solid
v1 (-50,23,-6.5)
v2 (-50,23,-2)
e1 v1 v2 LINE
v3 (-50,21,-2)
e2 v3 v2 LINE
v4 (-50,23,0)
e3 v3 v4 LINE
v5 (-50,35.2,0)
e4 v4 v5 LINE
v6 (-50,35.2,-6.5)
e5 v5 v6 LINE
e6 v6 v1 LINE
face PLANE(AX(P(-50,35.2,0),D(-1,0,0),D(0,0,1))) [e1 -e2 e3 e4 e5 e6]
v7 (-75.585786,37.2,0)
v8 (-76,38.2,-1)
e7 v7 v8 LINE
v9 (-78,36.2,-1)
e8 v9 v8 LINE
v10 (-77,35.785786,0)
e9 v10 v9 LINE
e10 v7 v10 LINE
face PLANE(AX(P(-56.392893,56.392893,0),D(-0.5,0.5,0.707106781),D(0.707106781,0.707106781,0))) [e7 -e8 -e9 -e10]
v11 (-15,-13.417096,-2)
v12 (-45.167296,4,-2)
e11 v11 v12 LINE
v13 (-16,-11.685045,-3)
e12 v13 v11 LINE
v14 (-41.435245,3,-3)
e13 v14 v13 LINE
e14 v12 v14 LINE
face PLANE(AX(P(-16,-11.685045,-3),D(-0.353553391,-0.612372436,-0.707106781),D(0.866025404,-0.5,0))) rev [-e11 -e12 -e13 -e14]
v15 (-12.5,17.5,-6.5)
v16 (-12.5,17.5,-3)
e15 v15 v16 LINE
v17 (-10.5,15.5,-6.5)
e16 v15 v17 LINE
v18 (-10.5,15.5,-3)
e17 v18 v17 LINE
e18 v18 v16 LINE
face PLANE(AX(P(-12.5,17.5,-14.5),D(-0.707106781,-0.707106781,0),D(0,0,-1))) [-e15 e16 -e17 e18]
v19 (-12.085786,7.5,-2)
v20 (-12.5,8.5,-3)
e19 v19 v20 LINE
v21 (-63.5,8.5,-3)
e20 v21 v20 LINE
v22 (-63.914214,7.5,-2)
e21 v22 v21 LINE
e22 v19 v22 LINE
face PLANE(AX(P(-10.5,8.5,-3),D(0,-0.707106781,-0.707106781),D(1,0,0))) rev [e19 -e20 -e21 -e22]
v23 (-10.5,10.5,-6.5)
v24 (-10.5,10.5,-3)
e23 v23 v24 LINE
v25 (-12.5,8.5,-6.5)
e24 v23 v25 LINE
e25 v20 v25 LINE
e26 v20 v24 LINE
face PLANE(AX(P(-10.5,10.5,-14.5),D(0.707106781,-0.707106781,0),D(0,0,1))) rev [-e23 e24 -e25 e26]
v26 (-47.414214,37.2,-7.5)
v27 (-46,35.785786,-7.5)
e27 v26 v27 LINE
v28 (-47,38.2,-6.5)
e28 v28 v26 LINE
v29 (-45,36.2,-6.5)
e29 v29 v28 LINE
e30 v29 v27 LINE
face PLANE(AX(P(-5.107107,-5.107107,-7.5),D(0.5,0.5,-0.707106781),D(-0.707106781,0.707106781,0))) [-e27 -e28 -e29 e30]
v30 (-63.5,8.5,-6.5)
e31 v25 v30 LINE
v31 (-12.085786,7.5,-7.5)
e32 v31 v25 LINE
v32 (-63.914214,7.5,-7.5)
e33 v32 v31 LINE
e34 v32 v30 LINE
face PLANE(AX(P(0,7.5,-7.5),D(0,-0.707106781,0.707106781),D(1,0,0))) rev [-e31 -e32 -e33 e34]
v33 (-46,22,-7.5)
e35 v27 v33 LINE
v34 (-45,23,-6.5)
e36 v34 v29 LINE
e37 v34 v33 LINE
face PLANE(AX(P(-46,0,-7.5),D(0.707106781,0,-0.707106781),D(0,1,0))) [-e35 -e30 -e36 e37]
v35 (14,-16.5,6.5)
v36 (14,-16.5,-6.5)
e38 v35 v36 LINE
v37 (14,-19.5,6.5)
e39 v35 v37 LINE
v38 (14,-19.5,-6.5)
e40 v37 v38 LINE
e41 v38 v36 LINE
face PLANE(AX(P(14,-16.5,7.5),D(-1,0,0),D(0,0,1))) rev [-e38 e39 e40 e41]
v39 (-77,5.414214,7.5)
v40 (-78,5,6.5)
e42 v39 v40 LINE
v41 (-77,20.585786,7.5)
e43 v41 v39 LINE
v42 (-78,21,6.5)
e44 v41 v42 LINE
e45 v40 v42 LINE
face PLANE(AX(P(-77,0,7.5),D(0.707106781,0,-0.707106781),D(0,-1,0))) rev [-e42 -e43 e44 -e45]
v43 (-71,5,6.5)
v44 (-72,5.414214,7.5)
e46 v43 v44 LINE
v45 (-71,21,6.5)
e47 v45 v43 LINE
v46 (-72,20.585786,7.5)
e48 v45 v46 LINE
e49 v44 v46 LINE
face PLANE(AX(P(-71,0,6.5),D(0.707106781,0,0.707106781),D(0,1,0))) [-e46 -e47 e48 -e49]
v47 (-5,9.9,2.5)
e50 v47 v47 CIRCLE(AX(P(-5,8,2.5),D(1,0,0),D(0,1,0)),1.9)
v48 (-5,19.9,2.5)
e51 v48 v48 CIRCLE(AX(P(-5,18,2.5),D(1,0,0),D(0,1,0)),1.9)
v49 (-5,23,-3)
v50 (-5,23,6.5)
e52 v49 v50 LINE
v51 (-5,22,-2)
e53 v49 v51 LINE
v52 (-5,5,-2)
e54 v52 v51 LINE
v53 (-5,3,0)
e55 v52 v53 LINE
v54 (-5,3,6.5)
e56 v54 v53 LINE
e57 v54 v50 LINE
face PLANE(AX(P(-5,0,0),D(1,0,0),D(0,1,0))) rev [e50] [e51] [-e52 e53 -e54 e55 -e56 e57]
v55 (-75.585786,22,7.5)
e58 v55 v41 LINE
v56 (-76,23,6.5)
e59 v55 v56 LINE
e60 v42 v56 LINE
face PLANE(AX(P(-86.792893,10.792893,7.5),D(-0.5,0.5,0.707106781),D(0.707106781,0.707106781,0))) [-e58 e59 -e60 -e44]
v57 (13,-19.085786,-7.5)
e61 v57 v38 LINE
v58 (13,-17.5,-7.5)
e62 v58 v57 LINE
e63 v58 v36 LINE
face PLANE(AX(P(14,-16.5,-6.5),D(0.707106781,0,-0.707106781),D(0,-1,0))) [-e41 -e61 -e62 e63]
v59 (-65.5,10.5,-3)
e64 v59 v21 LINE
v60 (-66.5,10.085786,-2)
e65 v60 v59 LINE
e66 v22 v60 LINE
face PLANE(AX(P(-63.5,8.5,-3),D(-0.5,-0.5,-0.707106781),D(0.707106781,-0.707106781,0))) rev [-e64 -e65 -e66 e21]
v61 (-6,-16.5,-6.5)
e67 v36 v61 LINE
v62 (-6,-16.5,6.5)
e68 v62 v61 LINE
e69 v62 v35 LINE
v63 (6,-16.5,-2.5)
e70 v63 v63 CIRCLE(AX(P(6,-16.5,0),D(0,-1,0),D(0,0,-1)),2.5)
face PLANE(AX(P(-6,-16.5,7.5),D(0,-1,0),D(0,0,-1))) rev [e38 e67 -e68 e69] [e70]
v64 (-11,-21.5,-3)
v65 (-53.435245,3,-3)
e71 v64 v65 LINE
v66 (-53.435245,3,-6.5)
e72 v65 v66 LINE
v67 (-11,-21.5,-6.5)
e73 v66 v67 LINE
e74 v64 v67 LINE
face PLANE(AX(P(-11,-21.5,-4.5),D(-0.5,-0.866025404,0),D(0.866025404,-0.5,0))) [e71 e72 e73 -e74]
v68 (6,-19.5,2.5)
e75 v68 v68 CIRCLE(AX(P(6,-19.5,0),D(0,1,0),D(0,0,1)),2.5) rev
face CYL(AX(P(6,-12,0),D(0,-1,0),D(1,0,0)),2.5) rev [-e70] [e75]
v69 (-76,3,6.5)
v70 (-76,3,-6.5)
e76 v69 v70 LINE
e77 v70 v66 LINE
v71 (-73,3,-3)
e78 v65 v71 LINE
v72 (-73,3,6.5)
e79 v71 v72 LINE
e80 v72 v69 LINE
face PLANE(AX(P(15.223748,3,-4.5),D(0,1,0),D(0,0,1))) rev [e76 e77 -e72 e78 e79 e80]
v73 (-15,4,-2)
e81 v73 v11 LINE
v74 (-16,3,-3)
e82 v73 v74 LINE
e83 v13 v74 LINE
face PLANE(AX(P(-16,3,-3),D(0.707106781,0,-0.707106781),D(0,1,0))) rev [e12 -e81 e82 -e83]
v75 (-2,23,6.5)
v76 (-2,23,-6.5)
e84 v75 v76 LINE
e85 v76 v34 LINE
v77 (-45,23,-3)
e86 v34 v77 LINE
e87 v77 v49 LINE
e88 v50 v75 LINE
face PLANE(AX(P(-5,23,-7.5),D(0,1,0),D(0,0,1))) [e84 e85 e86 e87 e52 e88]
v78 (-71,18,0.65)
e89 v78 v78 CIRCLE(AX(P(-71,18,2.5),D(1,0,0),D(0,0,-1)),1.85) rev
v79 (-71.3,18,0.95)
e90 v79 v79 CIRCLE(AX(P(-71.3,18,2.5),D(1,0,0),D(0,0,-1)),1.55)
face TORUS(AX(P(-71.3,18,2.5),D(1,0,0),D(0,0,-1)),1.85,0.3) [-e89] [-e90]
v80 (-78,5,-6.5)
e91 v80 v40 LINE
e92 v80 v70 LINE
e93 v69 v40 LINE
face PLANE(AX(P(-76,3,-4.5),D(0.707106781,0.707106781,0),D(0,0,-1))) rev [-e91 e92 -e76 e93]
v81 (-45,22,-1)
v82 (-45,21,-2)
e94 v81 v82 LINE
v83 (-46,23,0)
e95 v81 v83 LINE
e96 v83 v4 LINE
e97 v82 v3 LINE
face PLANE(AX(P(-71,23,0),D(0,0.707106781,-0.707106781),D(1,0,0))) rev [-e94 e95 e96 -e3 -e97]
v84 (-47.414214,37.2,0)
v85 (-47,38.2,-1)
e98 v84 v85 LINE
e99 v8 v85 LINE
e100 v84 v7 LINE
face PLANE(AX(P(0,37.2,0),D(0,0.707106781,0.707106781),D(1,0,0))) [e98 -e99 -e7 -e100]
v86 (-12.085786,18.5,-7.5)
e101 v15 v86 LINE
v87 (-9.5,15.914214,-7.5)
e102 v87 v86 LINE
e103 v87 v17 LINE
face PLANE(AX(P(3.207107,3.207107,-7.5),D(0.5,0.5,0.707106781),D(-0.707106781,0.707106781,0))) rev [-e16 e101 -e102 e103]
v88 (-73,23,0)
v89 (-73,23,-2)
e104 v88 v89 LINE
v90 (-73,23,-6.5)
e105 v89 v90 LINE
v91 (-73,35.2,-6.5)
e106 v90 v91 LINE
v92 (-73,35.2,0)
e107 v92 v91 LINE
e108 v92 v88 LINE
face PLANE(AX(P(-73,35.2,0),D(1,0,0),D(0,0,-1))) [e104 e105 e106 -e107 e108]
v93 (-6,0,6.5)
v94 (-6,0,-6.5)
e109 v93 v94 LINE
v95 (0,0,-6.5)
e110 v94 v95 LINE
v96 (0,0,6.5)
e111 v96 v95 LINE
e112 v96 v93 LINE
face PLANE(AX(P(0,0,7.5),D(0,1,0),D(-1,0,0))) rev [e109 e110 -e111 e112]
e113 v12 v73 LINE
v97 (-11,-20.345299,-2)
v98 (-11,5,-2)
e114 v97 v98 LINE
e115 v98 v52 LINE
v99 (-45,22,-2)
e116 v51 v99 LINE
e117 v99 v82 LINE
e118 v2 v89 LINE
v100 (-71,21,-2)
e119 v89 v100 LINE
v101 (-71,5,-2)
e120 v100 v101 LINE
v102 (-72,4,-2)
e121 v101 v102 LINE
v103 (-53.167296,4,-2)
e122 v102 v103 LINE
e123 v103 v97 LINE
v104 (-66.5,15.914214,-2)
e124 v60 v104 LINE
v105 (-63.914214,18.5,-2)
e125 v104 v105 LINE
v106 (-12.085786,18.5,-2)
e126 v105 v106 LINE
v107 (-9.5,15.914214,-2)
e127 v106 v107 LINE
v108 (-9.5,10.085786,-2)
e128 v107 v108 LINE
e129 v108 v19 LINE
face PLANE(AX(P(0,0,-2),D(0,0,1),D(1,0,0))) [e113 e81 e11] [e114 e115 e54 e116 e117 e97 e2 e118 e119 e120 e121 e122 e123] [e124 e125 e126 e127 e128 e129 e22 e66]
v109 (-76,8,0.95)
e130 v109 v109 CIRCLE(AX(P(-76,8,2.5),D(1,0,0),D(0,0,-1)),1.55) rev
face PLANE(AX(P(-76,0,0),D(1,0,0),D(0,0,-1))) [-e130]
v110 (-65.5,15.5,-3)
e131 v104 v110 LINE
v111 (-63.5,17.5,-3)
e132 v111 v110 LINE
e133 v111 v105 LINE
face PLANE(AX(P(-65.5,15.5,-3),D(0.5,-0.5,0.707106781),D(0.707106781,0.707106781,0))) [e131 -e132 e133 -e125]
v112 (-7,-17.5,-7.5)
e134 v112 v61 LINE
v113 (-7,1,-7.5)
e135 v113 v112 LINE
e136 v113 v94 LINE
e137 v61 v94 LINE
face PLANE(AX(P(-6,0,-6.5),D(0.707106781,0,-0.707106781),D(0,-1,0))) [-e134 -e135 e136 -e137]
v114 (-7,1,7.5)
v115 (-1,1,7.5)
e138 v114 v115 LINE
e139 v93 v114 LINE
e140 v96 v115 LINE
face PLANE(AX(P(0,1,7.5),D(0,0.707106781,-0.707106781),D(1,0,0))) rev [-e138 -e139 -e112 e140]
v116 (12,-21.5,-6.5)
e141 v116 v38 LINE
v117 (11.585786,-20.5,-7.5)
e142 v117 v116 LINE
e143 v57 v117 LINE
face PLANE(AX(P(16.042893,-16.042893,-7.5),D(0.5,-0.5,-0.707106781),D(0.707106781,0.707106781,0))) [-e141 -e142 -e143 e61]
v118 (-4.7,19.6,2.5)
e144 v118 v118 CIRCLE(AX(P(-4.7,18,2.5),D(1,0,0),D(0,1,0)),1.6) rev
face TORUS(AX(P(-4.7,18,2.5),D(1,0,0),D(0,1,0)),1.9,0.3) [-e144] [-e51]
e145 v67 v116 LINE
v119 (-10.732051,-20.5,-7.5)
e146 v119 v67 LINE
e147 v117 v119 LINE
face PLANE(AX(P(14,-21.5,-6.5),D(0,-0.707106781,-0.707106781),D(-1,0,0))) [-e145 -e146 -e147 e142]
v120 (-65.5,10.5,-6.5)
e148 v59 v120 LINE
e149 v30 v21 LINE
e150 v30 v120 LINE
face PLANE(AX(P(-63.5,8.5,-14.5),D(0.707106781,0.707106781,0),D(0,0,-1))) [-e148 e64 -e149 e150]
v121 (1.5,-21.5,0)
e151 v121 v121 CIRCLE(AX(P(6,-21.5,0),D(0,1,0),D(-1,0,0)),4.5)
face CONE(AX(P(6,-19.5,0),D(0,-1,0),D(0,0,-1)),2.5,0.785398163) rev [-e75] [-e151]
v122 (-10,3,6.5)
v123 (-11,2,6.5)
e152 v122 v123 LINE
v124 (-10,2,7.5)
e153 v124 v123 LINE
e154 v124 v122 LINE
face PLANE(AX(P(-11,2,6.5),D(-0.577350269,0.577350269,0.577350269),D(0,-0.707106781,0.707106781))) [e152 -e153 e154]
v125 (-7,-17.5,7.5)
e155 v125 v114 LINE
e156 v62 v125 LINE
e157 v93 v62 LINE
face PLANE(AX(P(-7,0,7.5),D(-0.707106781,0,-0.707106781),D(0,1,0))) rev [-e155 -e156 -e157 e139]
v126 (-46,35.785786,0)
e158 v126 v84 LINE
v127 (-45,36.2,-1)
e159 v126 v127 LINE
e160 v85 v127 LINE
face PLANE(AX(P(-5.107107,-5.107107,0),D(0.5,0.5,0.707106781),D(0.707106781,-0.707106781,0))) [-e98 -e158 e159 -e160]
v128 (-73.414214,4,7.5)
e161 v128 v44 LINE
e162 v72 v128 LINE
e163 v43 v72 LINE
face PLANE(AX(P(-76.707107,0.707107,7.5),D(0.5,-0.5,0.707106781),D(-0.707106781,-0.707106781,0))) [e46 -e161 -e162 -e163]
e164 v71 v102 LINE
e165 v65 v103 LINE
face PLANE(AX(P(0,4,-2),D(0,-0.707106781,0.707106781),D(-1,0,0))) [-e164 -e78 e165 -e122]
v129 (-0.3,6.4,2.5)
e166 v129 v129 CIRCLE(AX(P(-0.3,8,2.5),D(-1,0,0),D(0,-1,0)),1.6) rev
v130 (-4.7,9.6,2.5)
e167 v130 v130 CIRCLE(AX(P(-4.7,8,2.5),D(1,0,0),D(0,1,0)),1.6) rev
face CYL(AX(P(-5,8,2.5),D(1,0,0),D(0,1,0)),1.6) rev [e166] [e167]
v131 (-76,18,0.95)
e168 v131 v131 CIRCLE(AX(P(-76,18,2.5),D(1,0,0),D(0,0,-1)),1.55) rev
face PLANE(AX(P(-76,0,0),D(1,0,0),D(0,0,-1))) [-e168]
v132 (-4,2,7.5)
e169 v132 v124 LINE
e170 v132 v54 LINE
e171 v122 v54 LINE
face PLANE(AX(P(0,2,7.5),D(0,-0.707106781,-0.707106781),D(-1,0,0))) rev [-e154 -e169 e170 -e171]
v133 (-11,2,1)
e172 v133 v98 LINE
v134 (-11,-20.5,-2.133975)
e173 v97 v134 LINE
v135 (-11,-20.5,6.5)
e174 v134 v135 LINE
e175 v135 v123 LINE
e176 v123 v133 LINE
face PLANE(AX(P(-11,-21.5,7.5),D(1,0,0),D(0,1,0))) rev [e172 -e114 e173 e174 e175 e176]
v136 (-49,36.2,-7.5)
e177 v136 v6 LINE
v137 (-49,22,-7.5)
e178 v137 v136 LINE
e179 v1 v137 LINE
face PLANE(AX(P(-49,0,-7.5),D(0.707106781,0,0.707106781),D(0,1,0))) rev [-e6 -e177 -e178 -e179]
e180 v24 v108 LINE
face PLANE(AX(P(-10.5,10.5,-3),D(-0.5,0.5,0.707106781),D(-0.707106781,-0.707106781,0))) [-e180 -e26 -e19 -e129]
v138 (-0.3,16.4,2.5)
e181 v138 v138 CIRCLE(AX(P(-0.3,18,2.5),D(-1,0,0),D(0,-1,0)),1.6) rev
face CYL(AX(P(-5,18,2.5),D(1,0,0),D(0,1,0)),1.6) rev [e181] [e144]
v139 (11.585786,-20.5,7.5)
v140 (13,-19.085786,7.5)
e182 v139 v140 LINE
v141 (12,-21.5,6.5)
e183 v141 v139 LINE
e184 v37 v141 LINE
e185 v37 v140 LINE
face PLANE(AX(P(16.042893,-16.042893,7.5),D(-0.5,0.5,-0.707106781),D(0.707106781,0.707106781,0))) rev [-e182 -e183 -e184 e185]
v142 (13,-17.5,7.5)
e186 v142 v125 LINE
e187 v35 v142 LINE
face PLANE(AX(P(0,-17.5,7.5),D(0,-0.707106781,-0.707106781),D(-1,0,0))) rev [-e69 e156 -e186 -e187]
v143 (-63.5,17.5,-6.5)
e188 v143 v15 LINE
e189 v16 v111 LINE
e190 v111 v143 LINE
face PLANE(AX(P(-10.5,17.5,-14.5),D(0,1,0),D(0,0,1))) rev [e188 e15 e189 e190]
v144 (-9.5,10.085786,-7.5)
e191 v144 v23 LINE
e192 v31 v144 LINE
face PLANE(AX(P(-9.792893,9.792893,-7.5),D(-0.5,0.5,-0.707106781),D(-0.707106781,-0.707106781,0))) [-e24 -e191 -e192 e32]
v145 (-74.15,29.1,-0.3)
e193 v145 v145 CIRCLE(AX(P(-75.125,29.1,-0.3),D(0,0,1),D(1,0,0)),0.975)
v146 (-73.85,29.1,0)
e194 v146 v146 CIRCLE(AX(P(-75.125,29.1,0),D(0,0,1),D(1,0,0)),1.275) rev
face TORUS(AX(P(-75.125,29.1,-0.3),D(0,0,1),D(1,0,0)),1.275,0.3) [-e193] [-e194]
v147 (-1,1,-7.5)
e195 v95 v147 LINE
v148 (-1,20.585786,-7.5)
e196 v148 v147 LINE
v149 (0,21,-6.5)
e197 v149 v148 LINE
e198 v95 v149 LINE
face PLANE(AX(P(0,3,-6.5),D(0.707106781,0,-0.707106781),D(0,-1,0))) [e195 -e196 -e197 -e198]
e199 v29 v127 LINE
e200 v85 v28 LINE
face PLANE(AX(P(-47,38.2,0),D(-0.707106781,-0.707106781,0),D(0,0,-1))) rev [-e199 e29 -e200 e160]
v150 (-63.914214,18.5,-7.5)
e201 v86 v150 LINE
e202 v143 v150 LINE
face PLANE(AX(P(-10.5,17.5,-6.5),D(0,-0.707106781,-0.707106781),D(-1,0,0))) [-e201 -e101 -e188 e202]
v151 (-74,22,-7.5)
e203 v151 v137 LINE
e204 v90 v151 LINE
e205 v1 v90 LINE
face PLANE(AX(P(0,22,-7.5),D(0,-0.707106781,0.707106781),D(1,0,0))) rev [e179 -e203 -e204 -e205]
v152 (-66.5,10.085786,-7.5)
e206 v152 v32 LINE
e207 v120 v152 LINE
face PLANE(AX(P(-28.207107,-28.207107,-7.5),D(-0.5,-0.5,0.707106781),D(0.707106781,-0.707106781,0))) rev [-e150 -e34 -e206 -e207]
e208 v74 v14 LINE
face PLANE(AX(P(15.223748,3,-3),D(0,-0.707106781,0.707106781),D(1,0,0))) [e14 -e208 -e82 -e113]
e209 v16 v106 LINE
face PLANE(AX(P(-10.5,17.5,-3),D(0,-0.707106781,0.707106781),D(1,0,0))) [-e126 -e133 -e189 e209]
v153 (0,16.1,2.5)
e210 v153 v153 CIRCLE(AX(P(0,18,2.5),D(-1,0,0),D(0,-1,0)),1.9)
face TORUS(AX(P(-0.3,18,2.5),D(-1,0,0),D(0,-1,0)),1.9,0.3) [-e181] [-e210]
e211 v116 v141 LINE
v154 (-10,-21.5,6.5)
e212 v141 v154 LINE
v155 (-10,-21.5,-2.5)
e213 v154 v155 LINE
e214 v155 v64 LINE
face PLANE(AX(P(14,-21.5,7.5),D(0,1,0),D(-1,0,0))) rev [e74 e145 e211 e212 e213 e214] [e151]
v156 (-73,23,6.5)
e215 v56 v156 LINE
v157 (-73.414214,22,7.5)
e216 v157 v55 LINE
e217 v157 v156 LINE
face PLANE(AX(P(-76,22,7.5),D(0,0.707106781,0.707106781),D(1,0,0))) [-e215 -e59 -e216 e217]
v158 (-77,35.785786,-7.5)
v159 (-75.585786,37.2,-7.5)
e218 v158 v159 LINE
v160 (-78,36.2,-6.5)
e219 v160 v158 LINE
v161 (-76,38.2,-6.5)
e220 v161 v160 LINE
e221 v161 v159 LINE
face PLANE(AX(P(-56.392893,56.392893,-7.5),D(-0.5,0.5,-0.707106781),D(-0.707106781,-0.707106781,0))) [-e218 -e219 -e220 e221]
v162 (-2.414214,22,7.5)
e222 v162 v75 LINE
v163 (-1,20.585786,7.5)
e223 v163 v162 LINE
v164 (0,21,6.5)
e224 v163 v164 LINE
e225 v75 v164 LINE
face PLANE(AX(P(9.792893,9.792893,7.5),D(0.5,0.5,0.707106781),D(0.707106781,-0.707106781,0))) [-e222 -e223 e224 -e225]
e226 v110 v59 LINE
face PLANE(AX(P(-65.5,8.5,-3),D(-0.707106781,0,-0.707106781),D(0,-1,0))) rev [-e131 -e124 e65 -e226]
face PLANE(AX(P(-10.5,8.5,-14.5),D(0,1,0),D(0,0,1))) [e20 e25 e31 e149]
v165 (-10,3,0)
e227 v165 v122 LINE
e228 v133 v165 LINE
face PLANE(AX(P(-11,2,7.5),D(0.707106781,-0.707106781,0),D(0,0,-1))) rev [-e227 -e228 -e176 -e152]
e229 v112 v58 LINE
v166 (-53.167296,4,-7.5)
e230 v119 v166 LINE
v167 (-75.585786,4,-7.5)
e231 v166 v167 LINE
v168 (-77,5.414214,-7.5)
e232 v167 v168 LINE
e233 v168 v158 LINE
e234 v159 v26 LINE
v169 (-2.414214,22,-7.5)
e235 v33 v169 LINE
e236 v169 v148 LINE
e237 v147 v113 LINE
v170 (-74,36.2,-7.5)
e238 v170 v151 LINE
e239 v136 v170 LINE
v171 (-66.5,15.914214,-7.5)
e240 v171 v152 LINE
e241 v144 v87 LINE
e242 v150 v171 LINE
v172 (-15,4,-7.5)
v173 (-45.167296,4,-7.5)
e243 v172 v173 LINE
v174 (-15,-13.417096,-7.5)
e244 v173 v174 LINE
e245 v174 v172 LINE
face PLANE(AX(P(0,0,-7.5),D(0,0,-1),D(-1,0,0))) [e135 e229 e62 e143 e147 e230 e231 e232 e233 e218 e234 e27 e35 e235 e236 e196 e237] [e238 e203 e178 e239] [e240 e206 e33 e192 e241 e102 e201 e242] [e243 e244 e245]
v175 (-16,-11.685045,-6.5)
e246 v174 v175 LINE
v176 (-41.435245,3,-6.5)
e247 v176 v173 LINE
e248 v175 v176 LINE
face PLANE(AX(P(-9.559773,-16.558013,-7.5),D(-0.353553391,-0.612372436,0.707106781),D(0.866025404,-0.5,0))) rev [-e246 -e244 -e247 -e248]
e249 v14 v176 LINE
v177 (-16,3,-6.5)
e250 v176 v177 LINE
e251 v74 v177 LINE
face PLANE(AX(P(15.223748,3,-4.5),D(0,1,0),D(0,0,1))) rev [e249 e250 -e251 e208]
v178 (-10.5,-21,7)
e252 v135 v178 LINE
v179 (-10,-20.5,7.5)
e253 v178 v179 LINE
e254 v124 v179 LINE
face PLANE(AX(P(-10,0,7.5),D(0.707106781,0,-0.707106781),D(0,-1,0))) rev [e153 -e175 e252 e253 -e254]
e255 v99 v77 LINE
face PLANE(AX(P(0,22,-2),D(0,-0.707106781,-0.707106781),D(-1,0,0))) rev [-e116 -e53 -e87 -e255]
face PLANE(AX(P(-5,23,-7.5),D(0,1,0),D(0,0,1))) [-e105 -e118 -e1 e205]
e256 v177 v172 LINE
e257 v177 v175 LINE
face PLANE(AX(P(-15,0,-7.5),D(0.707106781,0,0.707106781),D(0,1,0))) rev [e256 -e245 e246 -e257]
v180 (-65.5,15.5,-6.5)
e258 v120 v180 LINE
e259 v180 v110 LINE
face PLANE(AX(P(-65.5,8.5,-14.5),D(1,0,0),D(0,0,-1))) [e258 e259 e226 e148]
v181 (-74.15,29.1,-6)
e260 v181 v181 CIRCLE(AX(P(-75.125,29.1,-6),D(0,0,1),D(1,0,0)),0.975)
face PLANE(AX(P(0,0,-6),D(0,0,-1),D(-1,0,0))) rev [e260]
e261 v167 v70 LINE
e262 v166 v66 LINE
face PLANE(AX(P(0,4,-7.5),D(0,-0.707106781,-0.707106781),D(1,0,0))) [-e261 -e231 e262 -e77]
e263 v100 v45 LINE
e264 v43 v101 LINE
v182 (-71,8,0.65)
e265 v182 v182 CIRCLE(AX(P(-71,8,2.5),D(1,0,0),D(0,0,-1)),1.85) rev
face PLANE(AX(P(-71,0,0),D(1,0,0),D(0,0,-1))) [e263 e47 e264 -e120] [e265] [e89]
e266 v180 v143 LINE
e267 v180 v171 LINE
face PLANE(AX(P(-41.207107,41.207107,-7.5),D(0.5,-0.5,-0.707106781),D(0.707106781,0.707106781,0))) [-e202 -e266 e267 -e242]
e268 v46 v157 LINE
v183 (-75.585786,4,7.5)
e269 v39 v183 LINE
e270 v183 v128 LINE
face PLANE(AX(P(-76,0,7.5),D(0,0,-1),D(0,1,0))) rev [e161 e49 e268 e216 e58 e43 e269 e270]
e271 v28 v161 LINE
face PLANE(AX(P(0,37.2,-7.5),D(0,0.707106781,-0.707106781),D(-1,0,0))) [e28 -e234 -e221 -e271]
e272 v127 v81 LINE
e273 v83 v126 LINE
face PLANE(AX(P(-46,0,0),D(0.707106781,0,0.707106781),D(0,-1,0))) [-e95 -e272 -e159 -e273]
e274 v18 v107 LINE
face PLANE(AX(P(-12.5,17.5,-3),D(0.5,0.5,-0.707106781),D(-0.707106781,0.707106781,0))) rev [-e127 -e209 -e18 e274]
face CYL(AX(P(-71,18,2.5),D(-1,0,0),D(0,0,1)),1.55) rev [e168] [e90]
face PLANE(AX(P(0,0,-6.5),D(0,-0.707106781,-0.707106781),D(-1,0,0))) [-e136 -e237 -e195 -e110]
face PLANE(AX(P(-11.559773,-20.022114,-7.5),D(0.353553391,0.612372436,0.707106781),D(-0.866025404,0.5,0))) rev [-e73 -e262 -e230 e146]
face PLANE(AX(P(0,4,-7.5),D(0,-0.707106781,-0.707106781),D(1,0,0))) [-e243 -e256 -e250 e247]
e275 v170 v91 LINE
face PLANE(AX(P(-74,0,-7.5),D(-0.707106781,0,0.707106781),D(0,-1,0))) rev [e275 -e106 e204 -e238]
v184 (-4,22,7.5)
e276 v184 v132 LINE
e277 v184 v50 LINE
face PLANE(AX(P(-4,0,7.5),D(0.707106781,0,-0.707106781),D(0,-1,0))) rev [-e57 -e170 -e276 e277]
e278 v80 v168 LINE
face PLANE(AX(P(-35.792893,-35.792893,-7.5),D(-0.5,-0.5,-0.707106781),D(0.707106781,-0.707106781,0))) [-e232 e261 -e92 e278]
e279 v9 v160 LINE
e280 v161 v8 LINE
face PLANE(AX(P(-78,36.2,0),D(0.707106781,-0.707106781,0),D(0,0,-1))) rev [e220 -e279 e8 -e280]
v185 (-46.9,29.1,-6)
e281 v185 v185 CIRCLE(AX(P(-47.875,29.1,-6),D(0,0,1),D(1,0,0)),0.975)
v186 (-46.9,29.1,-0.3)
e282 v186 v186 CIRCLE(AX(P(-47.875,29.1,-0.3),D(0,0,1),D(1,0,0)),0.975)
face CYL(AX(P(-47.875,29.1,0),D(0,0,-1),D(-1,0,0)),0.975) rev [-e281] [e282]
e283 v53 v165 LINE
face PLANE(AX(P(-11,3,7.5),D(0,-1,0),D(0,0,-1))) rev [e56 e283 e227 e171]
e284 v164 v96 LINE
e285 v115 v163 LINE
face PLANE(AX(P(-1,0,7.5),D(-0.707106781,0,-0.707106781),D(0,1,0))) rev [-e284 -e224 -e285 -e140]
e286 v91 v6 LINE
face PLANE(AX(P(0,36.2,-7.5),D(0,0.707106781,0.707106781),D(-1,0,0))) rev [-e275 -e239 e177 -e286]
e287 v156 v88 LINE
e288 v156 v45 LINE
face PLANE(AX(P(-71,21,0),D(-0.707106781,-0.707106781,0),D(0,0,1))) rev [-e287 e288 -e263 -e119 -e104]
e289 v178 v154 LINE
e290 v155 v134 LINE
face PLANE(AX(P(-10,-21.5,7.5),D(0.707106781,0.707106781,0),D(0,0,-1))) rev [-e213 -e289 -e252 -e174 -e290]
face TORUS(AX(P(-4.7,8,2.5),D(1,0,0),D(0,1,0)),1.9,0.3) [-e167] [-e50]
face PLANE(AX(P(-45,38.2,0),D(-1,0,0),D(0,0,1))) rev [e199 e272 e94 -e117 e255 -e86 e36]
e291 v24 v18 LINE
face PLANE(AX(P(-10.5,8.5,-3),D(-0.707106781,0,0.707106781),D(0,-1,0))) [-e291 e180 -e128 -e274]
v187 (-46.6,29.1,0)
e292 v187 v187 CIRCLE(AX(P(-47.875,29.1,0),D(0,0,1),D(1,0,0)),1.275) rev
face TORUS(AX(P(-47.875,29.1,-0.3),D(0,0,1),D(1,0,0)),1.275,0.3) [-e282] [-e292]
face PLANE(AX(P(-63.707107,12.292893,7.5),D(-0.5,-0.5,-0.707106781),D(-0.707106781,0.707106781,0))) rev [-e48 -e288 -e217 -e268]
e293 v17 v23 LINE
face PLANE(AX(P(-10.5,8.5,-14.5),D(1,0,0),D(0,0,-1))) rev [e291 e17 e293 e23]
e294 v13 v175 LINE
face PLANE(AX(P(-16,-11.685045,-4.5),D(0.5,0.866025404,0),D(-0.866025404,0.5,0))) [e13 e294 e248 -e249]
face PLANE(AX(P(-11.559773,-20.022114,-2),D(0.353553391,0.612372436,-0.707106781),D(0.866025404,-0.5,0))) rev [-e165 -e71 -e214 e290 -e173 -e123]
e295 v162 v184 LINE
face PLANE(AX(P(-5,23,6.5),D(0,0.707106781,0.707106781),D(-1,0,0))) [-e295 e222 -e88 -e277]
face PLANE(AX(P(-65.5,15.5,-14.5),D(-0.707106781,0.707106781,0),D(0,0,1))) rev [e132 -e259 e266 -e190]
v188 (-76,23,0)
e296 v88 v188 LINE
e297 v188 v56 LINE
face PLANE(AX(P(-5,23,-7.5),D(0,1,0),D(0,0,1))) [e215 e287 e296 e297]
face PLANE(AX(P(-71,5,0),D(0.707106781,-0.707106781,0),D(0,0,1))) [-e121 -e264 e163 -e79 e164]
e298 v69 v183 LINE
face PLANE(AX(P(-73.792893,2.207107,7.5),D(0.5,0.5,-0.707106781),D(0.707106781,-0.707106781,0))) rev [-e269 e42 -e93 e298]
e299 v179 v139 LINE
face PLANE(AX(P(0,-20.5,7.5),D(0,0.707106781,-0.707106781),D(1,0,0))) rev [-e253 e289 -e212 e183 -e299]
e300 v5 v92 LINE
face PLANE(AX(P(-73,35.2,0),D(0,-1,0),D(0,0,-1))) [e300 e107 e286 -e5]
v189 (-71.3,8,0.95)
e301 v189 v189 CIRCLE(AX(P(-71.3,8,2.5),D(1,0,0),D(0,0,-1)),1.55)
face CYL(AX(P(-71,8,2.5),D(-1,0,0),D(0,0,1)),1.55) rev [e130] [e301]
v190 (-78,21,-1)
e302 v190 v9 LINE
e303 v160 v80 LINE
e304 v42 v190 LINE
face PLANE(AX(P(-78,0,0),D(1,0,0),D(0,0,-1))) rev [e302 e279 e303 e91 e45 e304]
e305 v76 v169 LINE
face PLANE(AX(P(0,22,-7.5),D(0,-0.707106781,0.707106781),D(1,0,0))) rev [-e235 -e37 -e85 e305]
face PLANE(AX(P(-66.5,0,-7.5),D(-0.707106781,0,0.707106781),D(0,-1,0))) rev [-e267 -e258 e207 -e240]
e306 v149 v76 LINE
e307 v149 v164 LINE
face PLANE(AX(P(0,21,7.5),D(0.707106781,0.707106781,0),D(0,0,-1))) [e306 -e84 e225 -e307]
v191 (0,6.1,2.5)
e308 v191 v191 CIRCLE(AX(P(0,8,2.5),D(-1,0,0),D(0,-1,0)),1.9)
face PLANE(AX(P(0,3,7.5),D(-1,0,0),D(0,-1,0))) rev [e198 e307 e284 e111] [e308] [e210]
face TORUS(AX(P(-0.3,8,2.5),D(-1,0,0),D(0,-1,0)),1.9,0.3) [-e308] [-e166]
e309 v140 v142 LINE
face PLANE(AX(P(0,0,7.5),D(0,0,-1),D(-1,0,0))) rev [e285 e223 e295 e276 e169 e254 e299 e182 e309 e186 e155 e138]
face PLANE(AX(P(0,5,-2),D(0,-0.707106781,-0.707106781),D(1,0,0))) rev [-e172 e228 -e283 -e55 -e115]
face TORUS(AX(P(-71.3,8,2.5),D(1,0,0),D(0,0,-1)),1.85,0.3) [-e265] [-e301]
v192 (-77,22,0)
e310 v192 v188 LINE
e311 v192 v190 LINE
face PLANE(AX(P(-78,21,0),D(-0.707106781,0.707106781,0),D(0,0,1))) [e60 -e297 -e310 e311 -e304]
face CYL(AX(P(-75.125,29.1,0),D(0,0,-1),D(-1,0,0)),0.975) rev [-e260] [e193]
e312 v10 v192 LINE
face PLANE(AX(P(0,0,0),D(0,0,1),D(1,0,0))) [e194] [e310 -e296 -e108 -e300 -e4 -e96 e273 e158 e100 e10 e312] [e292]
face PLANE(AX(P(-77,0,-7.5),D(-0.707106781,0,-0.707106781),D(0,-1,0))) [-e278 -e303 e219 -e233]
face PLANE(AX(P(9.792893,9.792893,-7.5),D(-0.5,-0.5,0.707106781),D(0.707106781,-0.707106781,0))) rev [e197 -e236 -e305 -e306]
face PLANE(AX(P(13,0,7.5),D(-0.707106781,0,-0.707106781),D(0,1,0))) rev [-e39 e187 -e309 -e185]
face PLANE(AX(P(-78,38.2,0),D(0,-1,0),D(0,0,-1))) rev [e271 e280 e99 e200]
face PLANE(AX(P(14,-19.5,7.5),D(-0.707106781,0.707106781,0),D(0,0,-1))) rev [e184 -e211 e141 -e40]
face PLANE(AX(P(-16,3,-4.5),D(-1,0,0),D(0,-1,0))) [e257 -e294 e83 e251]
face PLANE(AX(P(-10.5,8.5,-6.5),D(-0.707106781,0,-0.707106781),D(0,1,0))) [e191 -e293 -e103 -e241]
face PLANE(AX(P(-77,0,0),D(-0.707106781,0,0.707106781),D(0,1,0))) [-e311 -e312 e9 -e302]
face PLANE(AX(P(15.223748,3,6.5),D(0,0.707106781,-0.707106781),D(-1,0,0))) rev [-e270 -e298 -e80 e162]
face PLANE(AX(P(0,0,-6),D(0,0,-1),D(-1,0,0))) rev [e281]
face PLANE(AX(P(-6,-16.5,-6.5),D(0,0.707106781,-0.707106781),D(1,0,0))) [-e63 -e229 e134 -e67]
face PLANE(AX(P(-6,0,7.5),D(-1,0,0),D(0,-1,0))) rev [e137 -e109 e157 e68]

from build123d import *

# Parameters (mm, degrees)
RESSALTO_EXTRUS_O1_DEPTH  = 7.5
ESBO_O2_W                 = 33
ESBO_O2_H                 = 18.2
ESBO_O2_R                 = 0.975
ESBO_O2_W_2               = 23
ESBO_O2_H_2               = 12.2
RESSALTO_EXTRUS_O2_DEPTH  = 3
ESBO_O3_R                 = 0.975
RESSALTO_EXTRUS_O3_DEPTH  = 6
RESSALTO_EXTRUS_O4_DEPTH  = 1.5
ESBO_O6_R                 = 2.5
CORTE_EXTRUS_O1_DEPTH     = 9.5
CHANFRO1_SIZE             = 2
ESBO_O7_W                 = 15
ESBO_O7_H                 = 20
ESBO_O7_R                 = 1.6
RESSALTO_EXTRUS_O5_DEPTH  = 5
ESBO_O9_W                 = 12
ESBO_O9_H                 = 20
RESSALTO_EXTRUS_O6_DEPTH  = 2
ESBO_O10_W                = 12
ESBO_O10_H                = 20
ESBO_O10_R                = 1.55
RESSALTO_EXTRUS_O7_DEPTH  = 5
ESBO_O12_W                = 3
ESBO_O12_H                = 20
RESSALTO_EXTRUS_O11_DEPTH = 73
ESBO_O17_W                = 26
ESBO_O17_H                = 3
CORTE_EXTRUS_O2_DEPTH     = 4.5
ESBO_O18_R                = 0.975
RESSALTO_EXTRUS_O14_DEPTH = 4.5
ESBO_O19_W                = 55
ESBO_O19_H                = 9
CORTE_EXTRUS_O3_DEPTH     = 10
CHANFRO5_SIZE             = 2
RESSALTO_EXTRUS_O15_DEPTH = 3
RESSALTO_EXTRUS_O16_DEPTH = 2.5
CHANFRO8_SIZE             = 2
CHANFRO9_SIZE             = 2
CHANFRO10_SIZE            = 1
CHANFRO11_SIZE            = 1
FILETE1_R                 = 0.3


with BuildPart() as part:
    # Esboço1 → Ressalto-extrusão1 (new, symmetric)
    with BuildSketch(Plane.XY):
        Polygon((0, 0), (-6, 0), (-6, -16.5), (14, -16.5), (14, -21.5), (-11, -21.5), (-11, 3), (0, 3), align=None)
    extrude(amount=RESSALTO_EXTRUS_O1_DEPTH, both=True)

    # Esboço6 → Corte-extrusão1 (cut)
    with BuildSketch(Plane.XZ.offset(21.5)):
        with Locations((6, 0)):
            Circle(ESBO_O6_R)
    extrude(amount=-CORTE_EXTRUS_O1_DEPTH, mode=Mode.SUBTRACT)

    # Chanfro1
    chanfro1_edges = [part.edges().sort_by_distance(p)[0] for p in [
        (3.5, -21.5, 0),
    ]]
    chamfer(chanfro1_edges, length=CHANFRO1_SIZE)

    # Esboço7 → Ressalto-extrusão5 (add)
    with BuildSketch(Plane(origin=(0, 0, 0), x_dir=(0, 0, -1), z_dir=(1, 0, 0))):
        with Locations((0, 13)):
            Rectangle(ESBO_O7_W, ESBO_O7_H)
        with Locations(Location((-2.5, 18, 0), (0, 0, 90))):
            Circle(ESBO_O7_R, mode=Mode.SUBTRACT)
        with Locations(Location((-2.5, 8, 0), (0, 0, 90))):
            Circle(ESBO_O7_R, mode=Mode.SUBTRACT)
    extrude(amount=-RESSALTO_EXTRUS_O5_DEPTH)



with BuildPart() as body_2:
    # Esboço2 → Ressalto-extrusão2 (new body)
    with BuildSketch(Plane.XY.offset(-3)):
        with Locations((-61.5, 29.1)):
            Rectangle(ESBO_O2_W, ESBO_O2_H)
        with Locations((-75.125, 29.1)):
            Circle(ESBO_O2_R, mode=Mode.SUBTRACT)
        with Locations((-47.875, 29.1)):
            Circle(ESBO_O2_R, mode=Mode.SUBTRACT)
        with Locations((-61.5, 29.1)):
            Rectangle(ESBO_O2_W_2, ESBO_O2_H_2, mode=Mode.SUBTRACT)
    extrude(amount=RESSALTO_EXTRUS_O2_DEPTH)

    # Esboço3 → Ressalto-extrusão3 (add)
    # profile 1 of 2: a face of its own
    with BuildSketch(Plane.XY):
        Polygon((-75.125, 31.553738644), (-77.25, 30.326869322), (-77.25, 27.873130678), (-75.125, 26.646261356), (-73, 27.873130678), (-73, 30.326869322), align=None)
        with Locations((-75.125, 29.1)):
            Circle(ESBO_O3_R, mode=Mode.SUBTRACT)
    # profile 2 of 2: a face of its own
    with BuildSketch(Plane.XY):
        Polygon((-47.875, 31.553738644), (-50, 30.326869322), (-50, 27.873130678), (-47.875, 26.646261356), (-45.75, 27.873130678), (-45.75, 30.326869322), align=None)
        with Locations((-47.875, 29.1)):
            Circle(ESBO_O3_R, mode=Mode.SUBTRACT)
    extrude(amount=-RESSALTO_EXTRUS_O3_DEPTH)

    # Esboço4 → Ressalto-extrusão4 (add)
    with BuildSketch(Plane(origin=(0, 0, -6), x_dir=(-1, 0, 0), z_dir=(0, 0, -1))):
        Polygon((47.875, 31.553738644), (45.75, 30.326869322), (45.75, 27.873130678), (47.875, 26.646261356), (50, 27.873130678), (50, 30.326869322), align=None)
        Polygon((75.125, 31.553738644), (73, 30.326869322), (73, 27.873130678), (75.125, 26.646261356), (77.25, 27.873130678), (77.25, 30.326869322), align=None)
    extrude(amount=RESSALTO_EXTRUS_O4_DEPTH)

    # Esboço9 → Ressalto-extrusão6 (add)
    with BuildSketch(Plane(origin=(-78, 0, 0), x_dir=(0, 0, -1), z_dir=(1, 0, 0))):
        with Locations((-1.5, 13)):
            Rectangle(ESBO_O9_W, ESBO_O9_H)
    extrude(amount=RESSALTO_EXTRUS_O6_DEPTH)

    # Esboço10 → Ressalto-extrusão7 (add)
    with BuildSketch(Plane(origin=(-76, 0, 0), x_dir=(0, 0, -1), z_dir=(1, 0, 0))):
        with Locations((-1.5, 13)):
            Rectangle(ESBO_O10_W, ESBO_O10_H)
        with Locations((-2.5, 18)):
            Circle(ESBO_O10_R, mode=Mode.SUBTRACT)
        with Locations((-2.5, 8)):
            Circle(ESBO_O10_R, mode=Mode.SUBTRACT)
    extrude(amount=RESSALTO_EXTRUS_O7_DEPTH)


with BuildPart() as part_1:
    add(part.part)

    add(body_2.part)  # Ressalto-extrusão11 merges body 2
    # Esboço12 → Ressalto-extrusão11 (add)
    with BuildSketch(Plane(origin=(-78, 0, 0), x_dir=(0, 0, -1), z_dir=(1, 0, 0))):
        with Locations((6, 13)):
            Rectangle(ESBO_O12_W, ESBO_O12_H)
    extrude(amount=RESSALTO_EXTRUS_O11_DEPTH)

    # Esboço17 → Corte-extrusão2 (cut)
    with BuildSketch(Plane.XY):
        with Locations((-58, 21.5)):
            Rectangle(ESBO_O17_W, ESBO_O17_H)
    extrude(amount=-CORTE_EXTRUS_O2_DEPTH, mode=Mode.SUBTRACT)

    # Esboço18 → Ressalto-extrusão14 (add)
    with BuildSketch(Plane(origin=(0, 0, -3), x_dir=(-1, 0, 0), z_dir=(0, 0, -1))):
        Polygon((45, 38.2), (45, 23), (50, 23), (50, 30.326869322), (50, 35.2), (73, 35.2), (73, 30.326869322), (73, 23), (78, 23), (78, 38.2), align=None)
        with Locations(Location((75.125, 29.1, 0), (0, 0, 180))):
            Circle(ESBO_O18_R, mode=Mode.SUBTRACT)
        with Locations(Location((47.875, 29.1, 0), (0, 0, 180))):
            Circle(ESBO_O18_R, mode=Mode.SUBTRACT)
    extrude(amount=RESSALTO_EXTRUS_O14_DEPTH)

    # Esboço19 → Corte-extrusão3 (cut)
    with BuildSketch(Plane.XY.offset(-4.5)):
        with Locations((-38, 13)):
            Rectangle(ESBO_O19_W, ESBO_O19_H)
    extrude(amount=-CORTE_EXTRUS_O3_DEPTH, mode=Mode.SUBTRACT)

    # Chanfro5
    chanfro5_edges = [part_1.edges().sort_by_distance(p)[0] for p in [
        (-65.5, 17.5, -6),
        (-10.5, 17.5, -6),
        (-10.5, 8.5, -6),
        (-65.5, 8.5, -6),
    ]]
    chamfer(chanfro5_edges, length=CHANFRO5_SIZE)

    # Esboço20 → Ressalto-extrusão15 (add)
    with BuildSketch(Plane(origin=(0, 0, -7.5), x_dir=(-1, 0, 0), z_dir=(0, 0, -1))):
        Polygon((11, -21.5), (53.435244785, 3), (41.435244785, 3), (16, -11.685045424), (16, 3), (11, 3), align=None)
    extrude(amount=-RESSALTO_EXTRUS_O15_DEPTH)

    # Esboço21 → Ressalto-extrusão16 (add)
    with BuildSketch(Plane.XY.offset(-4.5)):
        Polygon((-5, 23), (-45, 23), (-50, 23), (-71, 23), (-71, 3), (-53.435244785, 3), (-11, -21.5), (-11, 3), (-5, 3), align=None)
        Polygon((-16, -11.685045424), (-16, 3), (-41.435244785, 3), align=None, mode=Mode.SUBTRACT)
        Polygon((-12.5, 17.5), (-10.5, 15.5), (-10.5, 10.5), (-12.5, 8.5), (-63.5, 8.5), (-65.5, 10.5), (-65.5, 15.5), (-63.5, 17.5), align=None, mode=Mode.SUBTRACT)
    extrude(amount=RESSALTO_EXTRUS_O16_DEPTH)

    # Chanfro8
    chanfro8_edges = [part_1.edges().sort_by_distance(p)[0] for p in [
        (-47.5, 23, -2),
        (-8, 3, -2),
    ]]
    chamfer(chanfro8_edges, length=CHANFRO8_SIZE - 0.0001)  # a hair under: the kernel refuses the full size

    # Chanfro9
    chanfro9_edges = [part_1.edges().sort_by_distance(p)[0] for p in [
        (14, -21.5, 0),
        (-71, 23, 2.75),
        (0, 23, 0),
        (-78, 3, 0),
        (-78, 23, 3.75),
        (-78, 38.2, -3.75),
        (-45, 38.2, -3.75),
        (-71, 3, 2.75),
    ]]
    chamfer(chanfro9_edges, length=CHANFRO9_SIZE - 0.0001)  # a hair under: the kernel refuses the full size

    # Chanfro10
    chanfro10_edges = [part_1.edges().sort_by_distance(p)[0] for p in [
        (0.50005, -21.5, -7.5),
        (0, 10.50005, -7.5),
        (-45, 29.60005, 0),
        (-11, -9.25, 7.5),
        (-61.5, 23, -7.5),
        (-11, 3, 3.74995),
        (-23.49995, 23, -7.5),
        (-61.5, 35.2, -7.5),
        (0.50005, -21.5, 7.5),
        (-38, 8.5, -7.5),
        (-65.5, 13, -7.5),
        (-38, 17.5, -7.5),
        (-10.5, 13, -7.5),
        (-64.5, 9.5, -7.5),
        (-64.5, 16.5, -7.5),
        (-11.5, 9.5, -7.5),
        (-11.5, 16.5, -7.5),
        (4, -16.5, 7.5),
        (-28.717622393, 3, -7.5),
        (-64.717672393, 3, -7.5),
        (-32.217622393, -9.25, -7.5),
        (-28.717622393, -4.342522712, -7.5),
        (-16, -4.342522712, -7.5),
        (-25, 23, -2),
        (-63.217572393, 3, -2),
        (-32.217622393, -9.25, -2),
        (-6, -8.25, 7.5),
        (-28.717622393, -4.342522712, -2),
        (-16, -4.342522712, -2),
        (-28.717622393, 3, -2),
        (-38, 17.5, -2),
        (-64.5, 16.5, -2),
        (-65.5, 13, -2),
        (-64.5, 9.5, -2),
        (-38, 8.5, -2),
        (-11.5, 9.5, -2),
        (-10.5, 13, -2),
        (-11.5, 16.5, -2),
        (-3, 0, 7.5),
        (-8, 3, 7.5),
        (-5, 13, 7.5),
        (-78, 20.6, -7.5),
        (-78, 13, 7.5),
        (-78, 28.6001, 0),
        (-3.49995, 23, 7.5),
        (-61.5, 38.2, -7.5),
        (-45, 29.60005, -7.5),
        (14, -18.00005, -7.5),
        (-0.99995, 22.00005, -7.5),
        (13.00005, -20.50005, -7.5),
        (-77.00005, 3.99995, -7.5),
        (-45.99995, 37.20005, -7.5),
        (-77.00005, 37.20005, -7.5),
        (-61.5, 38.2, 0),
        (-45.99995, 37.20005, 0),
        (-77.00005, 37.20005, 0),
        (-71, 13, 7.5),
        (-74.5, 3, 7.5),
        (-74.5, 23, 7.5),
        (-77.00005, 22.00005, 7.5),
        (-71.99995, 22.00005, 7.5),
        (-77.00005, 3.99995, 7.5),
        (-71.99995, 3.99995, 7.5),
        (14, -18.00005, 7.5),
        (-0.99995, 22.00005, 7.5),
        (13.00005, -20.50005, 7.5),
        (0, 10.50005, 7.5),
        (-73, 29.1, -7.5),
        (-50, 29.1, -7.5),
        (-3, 0, -7.5),
        (-6, -8.25, -7.5),
        (4, -16.5, -7.5),
    ]]
    chamfer(chanfro10_edges, length=CHANFRO10_SIZE)

    # Chanfro11
    chanfro11_edges = [part_1.edges().sort_by_distance(p)[0] for p in [
        (-11, -21.5, 1.75),
    ]]
    chamfer(chanfro11_edges, length=CHANFRO11_SIZE)

    # Filete1
    filete1_edges = [part_1.edges().sort_by_distance(p)[0] for p in [
        (-5, 16.4, 2.5),
        (-5, 6.4, 2.5),
        (0, 6.4, 2.5),
        (0, 16.4, 2.5),
        (-76.1, 29.1, 0),
        (-48.85, 29.1, 0),
        (-71, 18, 4.05),
        (-71, 8, 4.05),
    ]]
    fillet(filete1_edges, radius=FILETE1_R)


solid = part_1.part
